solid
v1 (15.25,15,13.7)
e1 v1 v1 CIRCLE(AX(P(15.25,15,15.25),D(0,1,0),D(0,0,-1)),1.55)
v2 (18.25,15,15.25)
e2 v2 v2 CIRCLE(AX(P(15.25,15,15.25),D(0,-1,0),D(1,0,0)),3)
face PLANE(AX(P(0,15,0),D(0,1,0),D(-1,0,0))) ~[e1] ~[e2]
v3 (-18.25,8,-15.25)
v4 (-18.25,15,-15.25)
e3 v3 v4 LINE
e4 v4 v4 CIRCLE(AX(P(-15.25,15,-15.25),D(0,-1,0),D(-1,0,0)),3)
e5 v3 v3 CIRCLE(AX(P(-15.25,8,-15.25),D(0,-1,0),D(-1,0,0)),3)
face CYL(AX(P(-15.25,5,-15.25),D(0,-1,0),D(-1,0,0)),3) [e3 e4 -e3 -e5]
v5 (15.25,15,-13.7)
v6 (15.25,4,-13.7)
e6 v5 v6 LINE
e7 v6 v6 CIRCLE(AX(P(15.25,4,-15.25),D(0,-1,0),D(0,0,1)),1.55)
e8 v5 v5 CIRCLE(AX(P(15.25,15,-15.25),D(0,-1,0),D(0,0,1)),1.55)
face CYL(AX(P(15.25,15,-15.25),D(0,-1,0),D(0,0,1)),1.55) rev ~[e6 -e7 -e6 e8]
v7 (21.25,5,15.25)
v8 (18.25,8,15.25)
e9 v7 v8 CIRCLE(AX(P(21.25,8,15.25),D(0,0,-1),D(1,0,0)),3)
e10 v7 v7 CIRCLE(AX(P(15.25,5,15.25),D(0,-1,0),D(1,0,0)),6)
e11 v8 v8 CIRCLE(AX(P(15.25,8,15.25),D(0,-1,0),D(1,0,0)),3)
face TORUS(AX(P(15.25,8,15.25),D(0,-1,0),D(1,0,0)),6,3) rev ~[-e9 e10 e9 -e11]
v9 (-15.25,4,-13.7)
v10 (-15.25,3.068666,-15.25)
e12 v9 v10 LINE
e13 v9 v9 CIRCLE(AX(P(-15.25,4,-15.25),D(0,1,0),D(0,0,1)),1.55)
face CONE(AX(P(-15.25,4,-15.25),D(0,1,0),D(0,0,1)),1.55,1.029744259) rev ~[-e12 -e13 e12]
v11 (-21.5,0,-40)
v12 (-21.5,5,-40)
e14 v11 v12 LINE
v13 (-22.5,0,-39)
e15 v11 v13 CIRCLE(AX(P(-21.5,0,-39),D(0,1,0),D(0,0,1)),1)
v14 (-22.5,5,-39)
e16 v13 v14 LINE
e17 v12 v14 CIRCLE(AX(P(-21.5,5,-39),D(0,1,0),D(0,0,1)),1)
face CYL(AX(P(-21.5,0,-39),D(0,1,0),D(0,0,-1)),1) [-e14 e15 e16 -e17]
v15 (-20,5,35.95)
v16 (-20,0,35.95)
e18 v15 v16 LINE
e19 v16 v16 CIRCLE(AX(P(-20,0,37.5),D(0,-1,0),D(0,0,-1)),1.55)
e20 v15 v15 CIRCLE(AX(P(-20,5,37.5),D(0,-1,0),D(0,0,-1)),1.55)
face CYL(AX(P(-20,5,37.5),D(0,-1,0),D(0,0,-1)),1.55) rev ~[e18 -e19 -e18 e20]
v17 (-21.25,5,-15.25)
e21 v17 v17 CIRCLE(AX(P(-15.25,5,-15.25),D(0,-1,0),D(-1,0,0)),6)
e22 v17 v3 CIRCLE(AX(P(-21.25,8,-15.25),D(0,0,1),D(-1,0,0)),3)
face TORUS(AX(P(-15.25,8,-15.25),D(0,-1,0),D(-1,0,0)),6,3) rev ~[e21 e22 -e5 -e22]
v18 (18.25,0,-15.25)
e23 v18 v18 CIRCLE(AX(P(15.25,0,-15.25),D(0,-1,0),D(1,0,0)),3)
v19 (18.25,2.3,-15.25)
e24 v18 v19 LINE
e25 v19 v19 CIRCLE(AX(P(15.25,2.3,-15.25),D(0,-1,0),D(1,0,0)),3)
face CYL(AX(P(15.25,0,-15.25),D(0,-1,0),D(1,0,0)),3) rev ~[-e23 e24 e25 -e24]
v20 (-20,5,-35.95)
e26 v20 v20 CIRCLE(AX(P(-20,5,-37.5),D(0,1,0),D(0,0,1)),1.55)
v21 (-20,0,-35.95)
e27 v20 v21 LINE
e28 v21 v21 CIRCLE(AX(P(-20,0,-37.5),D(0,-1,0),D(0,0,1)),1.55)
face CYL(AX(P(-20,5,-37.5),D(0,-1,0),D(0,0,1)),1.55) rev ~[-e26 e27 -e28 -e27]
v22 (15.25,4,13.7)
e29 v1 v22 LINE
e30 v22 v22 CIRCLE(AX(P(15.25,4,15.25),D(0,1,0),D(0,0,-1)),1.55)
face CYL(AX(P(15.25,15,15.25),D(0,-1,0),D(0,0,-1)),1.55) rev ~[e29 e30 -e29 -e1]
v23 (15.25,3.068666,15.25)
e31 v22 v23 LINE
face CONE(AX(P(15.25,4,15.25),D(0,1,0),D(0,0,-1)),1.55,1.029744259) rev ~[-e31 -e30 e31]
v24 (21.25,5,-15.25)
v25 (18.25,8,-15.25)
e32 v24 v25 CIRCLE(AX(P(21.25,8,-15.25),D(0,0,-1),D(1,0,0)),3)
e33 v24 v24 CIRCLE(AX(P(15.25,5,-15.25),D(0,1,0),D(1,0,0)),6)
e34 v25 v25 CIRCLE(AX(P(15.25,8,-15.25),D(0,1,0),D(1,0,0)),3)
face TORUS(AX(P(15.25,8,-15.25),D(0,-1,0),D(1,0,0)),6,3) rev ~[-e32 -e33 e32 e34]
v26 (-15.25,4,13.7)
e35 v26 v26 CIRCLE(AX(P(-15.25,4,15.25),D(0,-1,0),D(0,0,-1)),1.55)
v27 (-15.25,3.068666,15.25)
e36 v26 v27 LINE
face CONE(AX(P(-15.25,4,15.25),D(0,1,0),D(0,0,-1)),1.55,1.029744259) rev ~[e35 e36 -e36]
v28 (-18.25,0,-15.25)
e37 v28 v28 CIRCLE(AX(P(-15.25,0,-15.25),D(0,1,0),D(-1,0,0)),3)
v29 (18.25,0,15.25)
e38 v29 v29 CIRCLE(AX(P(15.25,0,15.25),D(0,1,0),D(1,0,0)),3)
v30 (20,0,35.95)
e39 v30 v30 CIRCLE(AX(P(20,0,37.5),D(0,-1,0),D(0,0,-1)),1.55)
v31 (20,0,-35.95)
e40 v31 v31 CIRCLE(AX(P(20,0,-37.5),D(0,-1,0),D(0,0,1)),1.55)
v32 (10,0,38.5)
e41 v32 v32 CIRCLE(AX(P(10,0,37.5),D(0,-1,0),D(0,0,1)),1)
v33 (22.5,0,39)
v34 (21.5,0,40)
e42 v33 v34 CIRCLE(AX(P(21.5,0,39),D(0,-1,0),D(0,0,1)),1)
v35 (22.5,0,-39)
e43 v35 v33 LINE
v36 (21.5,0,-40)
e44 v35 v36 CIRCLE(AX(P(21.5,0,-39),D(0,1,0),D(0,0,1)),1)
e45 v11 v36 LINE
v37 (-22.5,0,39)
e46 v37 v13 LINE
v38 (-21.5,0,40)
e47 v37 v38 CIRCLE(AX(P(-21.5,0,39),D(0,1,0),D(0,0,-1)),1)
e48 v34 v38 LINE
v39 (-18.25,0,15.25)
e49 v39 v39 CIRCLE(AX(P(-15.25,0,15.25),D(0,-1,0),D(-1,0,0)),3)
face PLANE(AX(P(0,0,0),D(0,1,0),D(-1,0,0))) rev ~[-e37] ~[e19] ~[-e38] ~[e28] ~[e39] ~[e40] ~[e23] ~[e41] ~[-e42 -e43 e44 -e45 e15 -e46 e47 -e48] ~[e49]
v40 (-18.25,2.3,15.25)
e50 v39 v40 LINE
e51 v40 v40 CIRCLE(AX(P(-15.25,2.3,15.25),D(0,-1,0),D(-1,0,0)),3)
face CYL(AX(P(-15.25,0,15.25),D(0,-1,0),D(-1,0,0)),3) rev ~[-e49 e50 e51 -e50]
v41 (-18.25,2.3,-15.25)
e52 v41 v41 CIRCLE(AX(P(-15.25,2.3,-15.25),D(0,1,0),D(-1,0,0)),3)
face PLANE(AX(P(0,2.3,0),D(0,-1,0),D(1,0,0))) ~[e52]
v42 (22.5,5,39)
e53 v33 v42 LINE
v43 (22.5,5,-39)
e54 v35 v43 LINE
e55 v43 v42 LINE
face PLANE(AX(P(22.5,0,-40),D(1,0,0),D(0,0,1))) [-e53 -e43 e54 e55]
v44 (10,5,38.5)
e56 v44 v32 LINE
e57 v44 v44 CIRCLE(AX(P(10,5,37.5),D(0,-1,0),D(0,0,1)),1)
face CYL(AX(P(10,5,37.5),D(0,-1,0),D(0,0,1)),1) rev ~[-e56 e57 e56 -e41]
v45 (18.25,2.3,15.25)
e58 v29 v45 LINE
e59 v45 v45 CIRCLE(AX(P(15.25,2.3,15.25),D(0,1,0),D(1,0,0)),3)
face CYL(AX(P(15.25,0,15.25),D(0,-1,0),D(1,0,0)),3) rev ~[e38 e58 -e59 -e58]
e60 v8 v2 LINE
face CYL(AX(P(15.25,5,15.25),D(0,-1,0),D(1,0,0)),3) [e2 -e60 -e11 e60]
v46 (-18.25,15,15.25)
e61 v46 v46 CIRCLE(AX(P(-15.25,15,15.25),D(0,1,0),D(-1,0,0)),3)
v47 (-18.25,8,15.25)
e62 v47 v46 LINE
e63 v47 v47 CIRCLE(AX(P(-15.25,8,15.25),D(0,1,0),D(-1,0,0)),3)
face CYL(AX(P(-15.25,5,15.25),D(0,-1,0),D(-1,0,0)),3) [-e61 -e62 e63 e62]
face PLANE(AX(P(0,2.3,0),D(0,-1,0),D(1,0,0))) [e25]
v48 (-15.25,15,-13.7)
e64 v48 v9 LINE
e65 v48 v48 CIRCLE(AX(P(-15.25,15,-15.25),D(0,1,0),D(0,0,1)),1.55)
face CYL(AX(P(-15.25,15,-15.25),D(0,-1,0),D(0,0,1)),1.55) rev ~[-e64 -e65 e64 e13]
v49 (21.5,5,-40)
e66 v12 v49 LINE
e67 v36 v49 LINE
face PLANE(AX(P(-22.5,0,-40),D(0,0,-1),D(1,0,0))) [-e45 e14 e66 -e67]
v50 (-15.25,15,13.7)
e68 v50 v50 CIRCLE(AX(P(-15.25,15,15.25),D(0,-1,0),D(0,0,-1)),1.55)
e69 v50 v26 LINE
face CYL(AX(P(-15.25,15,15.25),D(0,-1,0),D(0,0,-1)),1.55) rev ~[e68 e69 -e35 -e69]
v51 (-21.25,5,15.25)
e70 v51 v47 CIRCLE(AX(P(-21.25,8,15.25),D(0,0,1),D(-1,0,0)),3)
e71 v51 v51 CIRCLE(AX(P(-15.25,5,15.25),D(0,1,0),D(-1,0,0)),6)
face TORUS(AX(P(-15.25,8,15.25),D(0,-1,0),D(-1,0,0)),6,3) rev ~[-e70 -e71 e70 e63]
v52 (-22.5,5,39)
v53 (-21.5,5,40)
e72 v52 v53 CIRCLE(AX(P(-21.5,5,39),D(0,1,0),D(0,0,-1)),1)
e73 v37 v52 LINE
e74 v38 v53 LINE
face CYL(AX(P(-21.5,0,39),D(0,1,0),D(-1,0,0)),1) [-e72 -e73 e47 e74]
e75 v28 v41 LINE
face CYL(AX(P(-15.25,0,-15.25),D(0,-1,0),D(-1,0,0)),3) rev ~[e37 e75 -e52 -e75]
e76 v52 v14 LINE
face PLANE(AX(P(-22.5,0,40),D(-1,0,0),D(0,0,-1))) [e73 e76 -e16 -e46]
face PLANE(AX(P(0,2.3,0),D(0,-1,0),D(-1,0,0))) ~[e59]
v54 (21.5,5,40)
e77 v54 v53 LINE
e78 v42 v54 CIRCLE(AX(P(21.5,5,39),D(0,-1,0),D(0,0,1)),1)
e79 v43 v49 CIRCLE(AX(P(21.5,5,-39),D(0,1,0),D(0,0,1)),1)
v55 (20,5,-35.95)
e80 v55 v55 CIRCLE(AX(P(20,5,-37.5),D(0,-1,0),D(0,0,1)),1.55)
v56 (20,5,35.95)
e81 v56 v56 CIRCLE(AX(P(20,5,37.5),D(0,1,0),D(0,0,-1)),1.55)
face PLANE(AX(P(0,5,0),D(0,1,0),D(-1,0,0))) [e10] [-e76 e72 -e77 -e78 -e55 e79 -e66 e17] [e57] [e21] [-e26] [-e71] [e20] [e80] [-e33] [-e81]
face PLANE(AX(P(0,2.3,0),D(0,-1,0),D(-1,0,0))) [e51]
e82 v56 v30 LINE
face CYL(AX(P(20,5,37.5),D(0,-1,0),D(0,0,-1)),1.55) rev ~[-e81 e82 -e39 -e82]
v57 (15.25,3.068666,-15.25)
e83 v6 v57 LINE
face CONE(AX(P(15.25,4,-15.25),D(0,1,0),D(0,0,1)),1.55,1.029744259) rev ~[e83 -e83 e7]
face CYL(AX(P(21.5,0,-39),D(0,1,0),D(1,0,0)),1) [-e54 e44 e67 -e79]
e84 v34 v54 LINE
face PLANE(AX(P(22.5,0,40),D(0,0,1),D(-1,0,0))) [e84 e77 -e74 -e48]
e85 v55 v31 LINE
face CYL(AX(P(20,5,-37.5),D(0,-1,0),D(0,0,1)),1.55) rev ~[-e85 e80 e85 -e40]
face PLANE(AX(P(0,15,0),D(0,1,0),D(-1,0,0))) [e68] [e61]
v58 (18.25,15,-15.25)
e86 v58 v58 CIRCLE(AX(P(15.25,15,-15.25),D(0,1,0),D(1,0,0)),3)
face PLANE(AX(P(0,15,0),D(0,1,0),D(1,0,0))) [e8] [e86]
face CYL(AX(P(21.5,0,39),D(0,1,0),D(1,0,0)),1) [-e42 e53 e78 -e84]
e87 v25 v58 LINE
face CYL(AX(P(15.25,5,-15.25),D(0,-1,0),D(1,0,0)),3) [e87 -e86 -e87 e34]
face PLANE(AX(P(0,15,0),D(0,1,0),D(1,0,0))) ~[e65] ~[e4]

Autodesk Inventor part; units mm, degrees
ref_plane "YZ Plane" through (0, 0, 0) normal (1, 0, 0) x (0, 1, 0)
ref_plane "XZ Plane" through (0, 0, 0) normal (0, 1, 0) x (-1, 0, 0)
ref_plane "XY Plane" through (0, 0, 0) normal (0, 0, 1) x (1, 0, 0)
sketch "Sketch1" plane through (0, 0, 0) normal (0, 1, 0) x (-1, 0, 0)
  line L0 (-22.5, 40) -> (22.5, 40)
  line L1 (22.5, 40) -> (22.5, -40)
  line L2 (22.5, -40) -> (-22.5, -40)
  line L3 (-22.5, -40) -> (-22.5, 40)
  line L4 (-22.5, 40) -> (22.5, -40) construction
  line L5 (22.5, 40) -> (-22.5, -40) construction
  point P0 (0, 0)
  dimension "d0" = 80
  dimension "d1" = 45
extrude "Extrusion1" add sketch "Sketch1" along normal blind 5
ref_plane "Work Plane1" through (22.5, 0, 0) normal (0, 0, -1) x (-1, 0, 0)
ref_plane "Work Plane2" through (0, 0, 40) normal (1, 0, 0) x (0, 0, -1)
sketch "Sketch2" plane through (0, 5, 0) normal (0, 1, 0) x (1, 0, 0)
  line L0 (-22.5, 40) -> (22.5, 40) projected
  line L1 (22.5, -40) -> (22.5, 40) projected
  point P0 (0, 0)
  point P1 (20, 37.5)
  dimension "d4" = 2.5
  dimension "d5" = 2.5
hole "Hole1" at (20, 5, -37.5) direction (0, -1, 0) diameter 3.1 end through all
fillet "Fillet1" radius 1 1 edges at (22.5, 2.5, -40)
sketch "Sketch3" plane through (0, 5, 0) normal (0, 1, 0) x (1, 0, 0)
  circle A0 centre (15.25, 15.25) radius 3
  line L0 (-31.5, 0) -> (31.5, 0) construction
  line L1 (0, 56) -> (0, -56) construction
  point P0 (0, 0)
  dimension "d14" = 15.25
  dimension "d15" = 15.25
  dimension "d16" = 6
extrude "Extrusion2" add sketch "Sketch3" along normal blind 10
hole "Hole2" at (15.25, 15, -15.25) direction (0, -1, 0) diameter 3.1 depth 11 tip angle 118
sketch "Sketch5" plane through (0, 0, 0) normal (0, -1, 0) x (1, 0, 0)
  circle A0 centre (15.25, -15.25) radius 3 projected
  point P0 (0, 0)
extrude "Extrusion3" cut sketch "Sketch5" against normal blind 2.3
fillet "Fillet2" radius 3 1 edges at (12.25, 5, -15.25)
mirror "Mirror1" about plane through (0, 0, 40) normal (1, 0, 0) of "Hole2", "Extrusion2", "Fillet1", "Hole1", "Extrusion3", "Fillet2"
mirror "Mirror2" about plane through (22.5, 0, 0) normal (0, 0, -1) of "Hole2", "Extrusion2", "Fillet1", "Hole1", "Mirror1", "Extrusion3", "Fillet2"
sketch "Sketch4" plane through (0, 5, 0) normal (0, 1, 0) x (1, 0, 0)
  circle A0 centre (-20, -37.5) radius 1.55 construction
  line L0 (-21.5, -40) -> (21.5, -40) construction
  point P0 (0, 0)
  point P1 (10, -37.5)
  dimension "d30" = 30
hole "Hole3" at (10, 5, 37.5) direction (0, -1, 0) diameter 2 end through all
equation "\"d14\" = d15"
properties part number "porte_carte"
